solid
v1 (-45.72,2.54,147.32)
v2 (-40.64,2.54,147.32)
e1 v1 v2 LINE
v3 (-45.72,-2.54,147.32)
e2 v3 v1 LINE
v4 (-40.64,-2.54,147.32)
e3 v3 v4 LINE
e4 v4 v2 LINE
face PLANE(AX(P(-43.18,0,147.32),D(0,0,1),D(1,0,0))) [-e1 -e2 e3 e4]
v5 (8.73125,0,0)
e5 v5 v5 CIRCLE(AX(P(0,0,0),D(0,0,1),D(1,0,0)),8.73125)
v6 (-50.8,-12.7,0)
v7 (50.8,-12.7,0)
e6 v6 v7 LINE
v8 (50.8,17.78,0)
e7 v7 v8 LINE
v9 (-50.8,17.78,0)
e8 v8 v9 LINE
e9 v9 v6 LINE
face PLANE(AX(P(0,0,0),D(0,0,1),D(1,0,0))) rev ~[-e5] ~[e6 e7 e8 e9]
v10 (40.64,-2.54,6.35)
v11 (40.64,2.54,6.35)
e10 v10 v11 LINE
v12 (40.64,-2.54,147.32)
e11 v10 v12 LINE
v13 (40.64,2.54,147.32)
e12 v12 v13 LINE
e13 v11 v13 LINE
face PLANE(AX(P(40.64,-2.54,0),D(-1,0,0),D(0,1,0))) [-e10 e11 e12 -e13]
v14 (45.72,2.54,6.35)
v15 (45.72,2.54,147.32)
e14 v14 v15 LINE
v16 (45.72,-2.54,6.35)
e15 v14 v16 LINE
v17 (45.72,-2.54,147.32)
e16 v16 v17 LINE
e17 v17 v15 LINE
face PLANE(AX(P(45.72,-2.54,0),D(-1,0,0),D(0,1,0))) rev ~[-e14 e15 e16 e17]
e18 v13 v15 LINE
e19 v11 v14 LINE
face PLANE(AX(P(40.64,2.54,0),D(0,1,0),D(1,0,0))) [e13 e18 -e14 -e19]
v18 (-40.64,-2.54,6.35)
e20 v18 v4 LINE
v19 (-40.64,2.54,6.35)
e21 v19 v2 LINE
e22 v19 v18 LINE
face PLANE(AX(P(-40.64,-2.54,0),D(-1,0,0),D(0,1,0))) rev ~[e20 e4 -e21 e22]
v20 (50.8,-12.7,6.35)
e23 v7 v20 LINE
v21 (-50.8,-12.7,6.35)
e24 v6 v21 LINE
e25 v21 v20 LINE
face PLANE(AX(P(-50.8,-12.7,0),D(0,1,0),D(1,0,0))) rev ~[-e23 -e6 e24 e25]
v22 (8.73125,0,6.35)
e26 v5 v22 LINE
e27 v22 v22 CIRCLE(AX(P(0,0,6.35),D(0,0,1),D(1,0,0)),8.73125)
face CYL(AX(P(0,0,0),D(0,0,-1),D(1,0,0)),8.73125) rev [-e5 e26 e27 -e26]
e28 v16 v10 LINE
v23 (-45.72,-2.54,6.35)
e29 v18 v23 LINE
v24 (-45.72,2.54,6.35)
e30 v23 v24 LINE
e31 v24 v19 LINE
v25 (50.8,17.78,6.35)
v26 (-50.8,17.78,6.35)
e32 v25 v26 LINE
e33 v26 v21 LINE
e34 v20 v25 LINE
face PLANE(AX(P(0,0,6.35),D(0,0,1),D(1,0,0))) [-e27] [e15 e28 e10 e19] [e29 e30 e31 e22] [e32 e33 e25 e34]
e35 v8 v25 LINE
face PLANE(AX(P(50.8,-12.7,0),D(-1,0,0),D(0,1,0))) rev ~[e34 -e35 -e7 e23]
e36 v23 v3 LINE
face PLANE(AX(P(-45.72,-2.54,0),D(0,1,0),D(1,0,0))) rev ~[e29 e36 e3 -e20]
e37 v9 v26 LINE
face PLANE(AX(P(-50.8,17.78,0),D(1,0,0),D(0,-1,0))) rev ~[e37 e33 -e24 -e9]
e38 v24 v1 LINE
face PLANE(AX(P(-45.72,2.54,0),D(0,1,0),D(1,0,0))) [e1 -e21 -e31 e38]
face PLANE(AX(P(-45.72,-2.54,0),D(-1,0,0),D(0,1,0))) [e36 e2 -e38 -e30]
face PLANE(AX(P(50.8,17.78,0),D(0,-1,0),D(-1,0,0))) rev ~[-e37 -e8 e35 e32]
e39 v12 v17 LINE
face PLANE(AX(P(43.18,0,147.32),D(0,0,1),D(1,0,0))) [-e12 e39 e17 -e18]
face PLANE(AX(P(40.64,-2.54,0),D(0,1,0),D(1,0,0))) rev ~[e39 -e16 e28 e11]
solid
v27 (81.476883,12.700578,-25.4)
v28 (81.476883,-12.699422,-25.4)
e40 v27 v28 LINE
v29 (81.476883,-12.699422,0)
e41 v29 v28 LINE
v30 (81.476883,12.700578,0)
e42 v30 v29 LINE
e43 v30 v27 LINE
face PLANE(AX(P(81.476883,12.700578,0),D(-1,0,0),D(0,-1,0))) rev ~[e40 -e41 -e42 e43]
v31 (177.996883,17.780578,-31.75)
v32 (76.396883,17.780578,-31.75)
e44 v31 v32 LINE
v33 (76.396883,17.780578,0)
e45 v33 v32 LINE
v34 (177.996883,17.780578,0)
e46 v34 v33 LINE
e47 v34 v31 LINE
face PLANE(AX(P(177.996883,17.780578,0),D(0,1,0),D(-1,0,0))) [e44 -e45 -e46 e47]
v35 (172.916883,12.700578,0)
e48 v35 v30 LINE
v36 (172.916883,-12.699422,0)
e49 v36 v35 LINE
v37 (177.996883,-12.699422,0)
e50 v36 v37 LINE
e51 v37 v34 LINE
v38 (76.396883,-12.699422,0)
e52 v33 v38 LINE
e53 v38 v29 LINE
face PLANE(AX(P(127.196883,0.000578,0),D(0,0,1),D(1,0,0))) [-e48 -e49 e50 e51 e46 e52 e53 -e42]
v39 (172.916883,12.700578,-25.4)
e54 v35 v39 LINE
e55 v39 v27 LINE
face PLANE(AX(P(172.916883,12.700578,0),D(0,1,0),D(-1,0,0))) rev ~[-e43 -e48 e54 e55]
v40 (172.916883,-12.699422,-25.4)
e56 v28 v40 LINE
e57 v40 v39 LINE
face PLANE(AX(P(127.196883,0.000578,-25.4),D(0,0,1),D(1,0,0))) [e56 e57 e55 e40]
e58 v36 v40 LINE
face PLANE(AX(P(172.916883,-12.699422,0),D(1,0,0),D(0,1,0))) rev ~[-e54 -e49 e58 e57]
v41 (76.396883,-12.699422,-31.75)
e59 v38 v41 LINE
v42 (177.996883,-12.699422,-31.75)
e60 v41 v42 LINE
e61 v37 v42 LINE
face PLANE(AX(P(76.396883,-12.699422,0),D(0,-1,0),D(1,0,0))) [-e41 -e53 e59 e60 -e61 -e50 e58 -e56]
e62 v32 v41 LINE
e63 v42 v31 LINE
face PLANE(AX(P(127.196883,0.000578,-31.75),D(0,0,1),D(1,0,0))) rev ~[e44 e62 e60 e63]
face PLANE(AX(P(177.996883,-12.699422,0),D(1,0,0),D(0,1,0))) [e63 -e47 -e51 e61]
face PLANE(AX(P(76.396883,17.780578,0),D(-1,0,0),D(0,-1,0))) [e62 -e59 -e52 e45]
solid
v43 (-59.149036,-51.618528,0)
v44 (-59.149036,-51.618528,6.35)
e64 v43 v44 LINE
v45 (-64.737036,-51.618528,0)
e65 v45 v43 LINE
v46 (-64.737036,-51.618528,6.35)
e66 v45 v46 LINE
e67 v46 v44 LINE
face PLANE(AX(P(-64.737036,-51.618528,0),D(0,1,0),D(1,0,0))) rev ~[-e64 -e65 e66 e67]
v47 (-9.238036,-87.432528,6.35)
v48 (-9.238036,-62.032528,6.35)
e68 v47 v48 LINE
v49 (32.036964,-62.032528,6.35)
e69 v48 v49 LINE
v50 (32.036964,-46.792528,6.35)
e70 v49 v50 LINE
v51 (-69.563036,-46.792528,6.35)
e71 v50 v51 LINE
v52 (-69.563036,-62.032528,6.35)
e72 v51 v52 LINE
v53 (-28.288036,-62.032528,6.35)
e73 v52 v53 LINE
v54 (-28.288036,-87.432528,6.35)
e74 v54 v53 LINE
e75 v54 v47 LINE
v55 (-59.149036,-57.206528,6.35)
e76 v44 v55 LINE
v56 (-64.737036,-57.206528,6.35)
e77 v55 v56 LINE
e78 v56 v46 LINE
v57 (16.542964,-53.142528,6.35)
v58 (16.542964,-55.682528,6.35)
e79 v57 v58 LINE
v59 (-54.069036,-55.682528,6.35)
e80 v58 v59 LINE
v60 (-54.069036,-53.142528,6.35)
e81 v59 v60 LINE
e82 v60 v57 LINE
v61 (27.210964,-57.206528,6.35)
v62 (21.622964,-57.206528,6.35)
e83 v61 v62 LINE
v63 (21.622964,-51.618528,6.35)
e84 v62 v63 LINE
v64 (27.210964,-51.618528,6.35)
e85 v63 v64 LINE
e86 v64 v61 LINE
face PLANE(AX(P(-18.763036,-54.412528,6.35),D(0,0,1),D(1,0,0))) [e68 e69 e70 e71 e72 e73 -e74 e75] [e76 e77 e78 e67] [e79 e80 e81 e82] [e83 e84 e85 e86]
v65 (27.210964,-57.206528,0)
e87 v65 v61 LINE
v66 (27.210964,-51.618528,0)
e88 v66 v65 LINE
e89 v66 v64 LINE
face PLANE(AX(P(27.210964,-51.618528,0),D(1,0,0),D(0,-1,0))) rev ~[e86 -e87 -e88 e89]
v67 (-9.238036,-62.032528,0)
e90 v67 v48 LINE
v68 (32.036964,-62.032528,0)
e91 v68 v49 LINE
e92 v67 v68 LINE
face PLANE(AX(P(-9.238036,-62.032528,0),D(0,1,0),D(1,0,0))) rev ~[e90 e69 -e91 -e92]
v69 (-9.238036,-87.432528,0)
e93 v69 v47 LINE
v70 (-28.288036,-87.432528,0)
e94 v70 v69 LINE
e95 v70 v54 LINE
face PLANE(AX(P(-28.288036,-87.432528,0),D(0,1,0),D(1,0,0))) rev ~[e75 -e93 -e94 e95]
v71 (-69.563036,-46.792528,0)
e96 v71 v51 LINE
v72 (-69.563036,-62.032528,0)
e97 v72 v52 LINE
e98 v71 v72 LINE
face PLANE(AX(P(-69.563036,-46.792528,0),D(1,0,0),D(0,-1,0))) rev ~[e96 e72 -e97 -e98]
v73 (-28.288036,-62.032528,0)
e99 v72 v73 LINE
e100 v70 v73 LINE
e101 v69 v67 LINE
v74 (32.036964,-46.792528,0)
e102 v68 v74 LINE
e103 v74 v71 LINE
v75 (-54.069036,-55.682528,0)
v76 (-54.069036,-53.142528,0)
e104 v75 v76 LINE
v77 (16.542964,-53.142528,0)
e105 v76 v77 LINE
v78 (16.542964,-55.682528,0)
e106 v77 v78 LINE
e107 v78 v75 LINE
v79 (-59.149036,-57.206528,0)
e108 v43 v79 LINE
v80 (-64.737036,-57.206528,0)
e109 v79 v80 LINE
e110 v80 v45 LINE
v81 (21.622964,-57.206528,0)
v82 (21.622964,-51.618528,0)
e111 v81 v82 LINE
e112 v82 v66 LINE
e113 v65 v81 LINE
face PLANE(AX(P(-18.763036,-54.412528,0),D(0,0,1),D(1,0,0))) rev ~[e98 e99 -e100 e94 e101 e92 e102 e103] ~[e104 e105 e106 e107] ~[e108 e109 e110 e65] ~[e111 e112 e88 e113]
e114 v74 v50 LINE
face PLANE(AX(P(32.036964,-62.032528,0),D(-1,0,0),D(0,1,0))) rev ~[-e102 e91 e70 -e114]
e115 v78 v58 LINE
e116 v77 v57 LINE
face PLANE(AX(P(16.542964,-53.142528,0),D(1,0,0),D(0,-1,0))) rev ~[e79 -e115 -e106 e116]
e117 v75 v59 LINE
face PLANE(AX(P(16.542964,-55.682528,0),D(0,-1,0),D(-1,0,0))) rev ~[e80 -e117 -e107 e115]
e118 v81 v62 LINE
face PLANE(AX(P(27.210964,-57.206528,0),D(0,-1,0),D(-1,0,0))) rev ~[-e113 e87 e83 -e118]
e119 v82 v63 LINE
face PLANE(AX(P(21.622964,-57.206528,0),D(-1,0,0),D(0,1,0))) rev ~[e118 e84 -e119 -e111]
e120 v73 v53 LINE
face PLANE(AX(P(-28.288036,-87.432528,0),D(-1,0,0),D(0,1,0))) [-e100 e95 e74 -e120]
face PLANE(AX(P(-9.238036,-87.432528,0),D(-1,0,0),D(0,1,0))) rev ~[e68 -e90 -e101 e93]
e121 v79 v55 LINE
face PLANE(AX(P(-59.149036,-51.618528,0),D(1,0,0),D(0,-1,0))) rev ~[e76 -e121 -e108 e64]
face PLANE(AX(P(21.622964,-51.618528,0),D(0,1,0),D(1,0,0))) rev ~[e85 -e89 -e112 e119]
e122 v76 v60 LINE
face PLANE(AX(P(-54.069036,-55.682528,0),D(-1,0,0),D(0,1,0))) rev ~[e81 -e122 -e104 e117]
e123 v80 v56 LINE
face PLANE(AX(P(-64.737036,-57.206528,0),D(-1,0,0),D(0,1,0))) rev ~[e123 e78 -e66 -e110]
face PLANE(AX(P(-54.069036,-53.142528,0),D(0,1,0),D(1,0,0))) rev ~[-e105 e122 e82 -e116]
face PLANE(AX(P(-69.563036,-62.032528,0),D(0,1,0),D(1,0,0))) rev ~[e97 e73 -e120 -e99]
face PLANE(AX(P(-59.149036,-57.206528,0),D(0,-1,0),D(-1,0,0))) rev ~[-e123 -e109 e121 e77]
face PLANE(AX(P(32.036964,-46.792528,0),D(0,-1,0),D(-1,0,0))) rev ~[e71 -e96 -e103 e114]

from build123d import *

# Parameters (mm, degrees)
F0_W     = 5.08
F0_H     = 5.08
F1_DEPTH = 147.32
F0_R     = 8.73125
F2_DEPTH = 6.35
F3_W     = 19.05
F3_H     = 25.4
F4_DEPTH = 6.35
F5_W     = 5.08
F5_H     = 5.08
F6_DEPTH = 31.75
F7_DEPTH = 25.4


# Not quite as in the source:
# - a feature names something its author has since deleted; it is built from what else it names


with BuildPart() as f1:
    # F0 (on Top) → F1 (new body)
    with BuildSketch(Plane.XY):
        with Locations((43.18, 0)):
            Rectangle(F0_W, F0_H)
    extrude(amount=F1_DEPTH)



with BuildPart() as f1b:
    # F0 (on Top) → F1, piece 2 (new body)
    with BuildSketch(Plane.XY):
        with Locations((-43.18, 0)):
            Rectangle(F0_W, F0_H)
    extrude(amount=F1_DEPTH)


with BuildPart() as f1_1:
    add(f1.part)

    add(f1b.part)  # F2 merges F1b
    # F0 (on Top) → F2 (join)
    with BuildSketch(Plane.XY):
        Polygon((45.72, 2.54), (45.72, 12.7), (-45.72, 12.7), (-45.72, 2.54), (-40.64, 2.54), (-40.64, -2.54), (-45.72, -2.54), (-45.72, -12.7), (45.72, -12.7), (45.72, -2.54), (40.64, -2.54), (40.64, 2.54), align=None)
        Circle(F0_R, mode=Mode.SUBTRACT)
        Polygon((-45.72, 12.7), (45.72, 12.7), (45.72, 2.54), (45.72, -2.54), (45.72, -12.7), (50.8, -12.7), (50.8, 17.78), (-50.8, 17.78), (-50.8, -12.7), (-45.72, -12.7), (-45.72, -2.54), (-45.72, 2.54), align=None)
    extrude(amount=F2_DEPTH)


with BuildPart() as f4:
    # F3 (on Top) → F4 (new body)
    with BuildSketch(Plane.XY):
        Polygon((-69.5630355358, -46.7925282216), (-69.5630355358, -62.0325282216), (-28.2880355358, -62.0325282216), (-9.2380355358, -62.0325282216), (32.0369644642, -62.0325282216), (32.0369644642, -46.7925282216), align=None)
        Polygon((-64.7370355358, -57.2065282216), (-64.7370355358, -51.6185282216), (-59.1490355358, -51.6185282216), (-54.0690355358, -51.6185282216), (-54.0690355358, -53.1425282216), (16.5429644642, -53.1425282216), (16.5429644642, -51.6185282216), (21.6229644642, -51.6185282216), (27.2109644642, -51.6185282216), (27.2109644642, -57.2065282216), (21.6229644642, -57.2065282216), (16.5429644642, -57.2065282216), (16.5429644642, -55.6825282216), (-54.0690355358, -55.6825282216), (-54.0690355358, -57.2065282216), (-59.1490355358, -57.2065282216), align=None, mode=Mode.SUBTRACT)
        with Locations((-18.7630355358, -74.7325282216)):
            Rectangle(F3_W, F3_H)
        Polygon((16.5429644642, -51.6185282216), (16.5429644642, -53.1425282216), (16.5429644642, -55.6825282216), (16.5429644642, -57.2065282216), (21.6229644642, -57.2065282216), (21.6229644642, -51.6185282216), align=None)
        Polygon((-54.0690355358, -51.6185282216), (-59.1490355358, -51.6185282216), (-59.1490355358, -57.2065282216), (-54.0690355358, -57.2065282216), (-54.0690355358, -55.6825282216), (-54.0690355358, -53.1425282216), align=None)
    extrude(amount=F4_DEPTH)


with BuildPart() as f6:
    # F5 (on Top) → F6 (new body)
    with BuildSketch(Plane.XY):
        Polygon((172.916882534, 2.5405777639), (172.916882534, 12.7005777639), (81.476882534, 12.7005777639), (81.476882534, 2.5405777639), (86.556882534, 2.5405777639), (86.556882534, -2.5394222361), (81.476882534, -2.5394222361), (81.476882534, -12.6994222361), (172.916882534, -12.6994222361), (172.916882534, -2.5394222361), (167.836882534, -2.5394222361), (167.836882534, 2.5405777639), align=None)
        Polygon((81.476882534, 12.7005777639), (172.916882534, 12.7005777639), (172.916882534, 2.5405777639), (172.916882534, -2.5394222361), (172.916882534, -12.6994222361), (177.996882534, -12.6994222361), (177.996882534, 17.7805777639), (76.396882534, 17.7805777639), (76.396882534, -12.6994222361), (81.476882534, -12.6994222361), (81.476882534, -2.5394222361), (81.476882534, 2.5405777639), align=None)
        with Locations((84.016882534, 0.0005777639)):
            Rectangle(F5_W, F5_H)
        with Locations((170.376882534, 0.0005777639)):
            Rectangle(F5_W, F5_H)
    extrude(amount=-F6_DEPTH)

    # F5 (on Top) → F7 (cut)
    with BuildSketch(Plane.XY):
        Polygon((172.916882534, 2.5405777639), (172.916882534, 12.7005777639), (81.476882534, 12.7005777639), (81.476882534, 2.5405777639), (86.556882534, 2.5405777639), (86.556882534, -2.5394222361), (81.476882534, -2.5394222361), (81.476882534, -12.6994222361), (172.916882534, -12.6994222361), (172.916882534, -2.5394222361), (167.836882534, -2.5394222361), (167.836882534, 2.5405777639), align=None)
        with Locations((170.376882534, 0.0005777639)):
            Rectangle(F5_W, F5_H)
        with Locations((84.016882534, 0.0005777639)):
            Rectangle(F5_W, F5_H)
    extrude(amount=-F7_DEPTH, mode=Mode.SUBTRACT)


solid = Compound([f1_1.part, f4.part, f6.part])
